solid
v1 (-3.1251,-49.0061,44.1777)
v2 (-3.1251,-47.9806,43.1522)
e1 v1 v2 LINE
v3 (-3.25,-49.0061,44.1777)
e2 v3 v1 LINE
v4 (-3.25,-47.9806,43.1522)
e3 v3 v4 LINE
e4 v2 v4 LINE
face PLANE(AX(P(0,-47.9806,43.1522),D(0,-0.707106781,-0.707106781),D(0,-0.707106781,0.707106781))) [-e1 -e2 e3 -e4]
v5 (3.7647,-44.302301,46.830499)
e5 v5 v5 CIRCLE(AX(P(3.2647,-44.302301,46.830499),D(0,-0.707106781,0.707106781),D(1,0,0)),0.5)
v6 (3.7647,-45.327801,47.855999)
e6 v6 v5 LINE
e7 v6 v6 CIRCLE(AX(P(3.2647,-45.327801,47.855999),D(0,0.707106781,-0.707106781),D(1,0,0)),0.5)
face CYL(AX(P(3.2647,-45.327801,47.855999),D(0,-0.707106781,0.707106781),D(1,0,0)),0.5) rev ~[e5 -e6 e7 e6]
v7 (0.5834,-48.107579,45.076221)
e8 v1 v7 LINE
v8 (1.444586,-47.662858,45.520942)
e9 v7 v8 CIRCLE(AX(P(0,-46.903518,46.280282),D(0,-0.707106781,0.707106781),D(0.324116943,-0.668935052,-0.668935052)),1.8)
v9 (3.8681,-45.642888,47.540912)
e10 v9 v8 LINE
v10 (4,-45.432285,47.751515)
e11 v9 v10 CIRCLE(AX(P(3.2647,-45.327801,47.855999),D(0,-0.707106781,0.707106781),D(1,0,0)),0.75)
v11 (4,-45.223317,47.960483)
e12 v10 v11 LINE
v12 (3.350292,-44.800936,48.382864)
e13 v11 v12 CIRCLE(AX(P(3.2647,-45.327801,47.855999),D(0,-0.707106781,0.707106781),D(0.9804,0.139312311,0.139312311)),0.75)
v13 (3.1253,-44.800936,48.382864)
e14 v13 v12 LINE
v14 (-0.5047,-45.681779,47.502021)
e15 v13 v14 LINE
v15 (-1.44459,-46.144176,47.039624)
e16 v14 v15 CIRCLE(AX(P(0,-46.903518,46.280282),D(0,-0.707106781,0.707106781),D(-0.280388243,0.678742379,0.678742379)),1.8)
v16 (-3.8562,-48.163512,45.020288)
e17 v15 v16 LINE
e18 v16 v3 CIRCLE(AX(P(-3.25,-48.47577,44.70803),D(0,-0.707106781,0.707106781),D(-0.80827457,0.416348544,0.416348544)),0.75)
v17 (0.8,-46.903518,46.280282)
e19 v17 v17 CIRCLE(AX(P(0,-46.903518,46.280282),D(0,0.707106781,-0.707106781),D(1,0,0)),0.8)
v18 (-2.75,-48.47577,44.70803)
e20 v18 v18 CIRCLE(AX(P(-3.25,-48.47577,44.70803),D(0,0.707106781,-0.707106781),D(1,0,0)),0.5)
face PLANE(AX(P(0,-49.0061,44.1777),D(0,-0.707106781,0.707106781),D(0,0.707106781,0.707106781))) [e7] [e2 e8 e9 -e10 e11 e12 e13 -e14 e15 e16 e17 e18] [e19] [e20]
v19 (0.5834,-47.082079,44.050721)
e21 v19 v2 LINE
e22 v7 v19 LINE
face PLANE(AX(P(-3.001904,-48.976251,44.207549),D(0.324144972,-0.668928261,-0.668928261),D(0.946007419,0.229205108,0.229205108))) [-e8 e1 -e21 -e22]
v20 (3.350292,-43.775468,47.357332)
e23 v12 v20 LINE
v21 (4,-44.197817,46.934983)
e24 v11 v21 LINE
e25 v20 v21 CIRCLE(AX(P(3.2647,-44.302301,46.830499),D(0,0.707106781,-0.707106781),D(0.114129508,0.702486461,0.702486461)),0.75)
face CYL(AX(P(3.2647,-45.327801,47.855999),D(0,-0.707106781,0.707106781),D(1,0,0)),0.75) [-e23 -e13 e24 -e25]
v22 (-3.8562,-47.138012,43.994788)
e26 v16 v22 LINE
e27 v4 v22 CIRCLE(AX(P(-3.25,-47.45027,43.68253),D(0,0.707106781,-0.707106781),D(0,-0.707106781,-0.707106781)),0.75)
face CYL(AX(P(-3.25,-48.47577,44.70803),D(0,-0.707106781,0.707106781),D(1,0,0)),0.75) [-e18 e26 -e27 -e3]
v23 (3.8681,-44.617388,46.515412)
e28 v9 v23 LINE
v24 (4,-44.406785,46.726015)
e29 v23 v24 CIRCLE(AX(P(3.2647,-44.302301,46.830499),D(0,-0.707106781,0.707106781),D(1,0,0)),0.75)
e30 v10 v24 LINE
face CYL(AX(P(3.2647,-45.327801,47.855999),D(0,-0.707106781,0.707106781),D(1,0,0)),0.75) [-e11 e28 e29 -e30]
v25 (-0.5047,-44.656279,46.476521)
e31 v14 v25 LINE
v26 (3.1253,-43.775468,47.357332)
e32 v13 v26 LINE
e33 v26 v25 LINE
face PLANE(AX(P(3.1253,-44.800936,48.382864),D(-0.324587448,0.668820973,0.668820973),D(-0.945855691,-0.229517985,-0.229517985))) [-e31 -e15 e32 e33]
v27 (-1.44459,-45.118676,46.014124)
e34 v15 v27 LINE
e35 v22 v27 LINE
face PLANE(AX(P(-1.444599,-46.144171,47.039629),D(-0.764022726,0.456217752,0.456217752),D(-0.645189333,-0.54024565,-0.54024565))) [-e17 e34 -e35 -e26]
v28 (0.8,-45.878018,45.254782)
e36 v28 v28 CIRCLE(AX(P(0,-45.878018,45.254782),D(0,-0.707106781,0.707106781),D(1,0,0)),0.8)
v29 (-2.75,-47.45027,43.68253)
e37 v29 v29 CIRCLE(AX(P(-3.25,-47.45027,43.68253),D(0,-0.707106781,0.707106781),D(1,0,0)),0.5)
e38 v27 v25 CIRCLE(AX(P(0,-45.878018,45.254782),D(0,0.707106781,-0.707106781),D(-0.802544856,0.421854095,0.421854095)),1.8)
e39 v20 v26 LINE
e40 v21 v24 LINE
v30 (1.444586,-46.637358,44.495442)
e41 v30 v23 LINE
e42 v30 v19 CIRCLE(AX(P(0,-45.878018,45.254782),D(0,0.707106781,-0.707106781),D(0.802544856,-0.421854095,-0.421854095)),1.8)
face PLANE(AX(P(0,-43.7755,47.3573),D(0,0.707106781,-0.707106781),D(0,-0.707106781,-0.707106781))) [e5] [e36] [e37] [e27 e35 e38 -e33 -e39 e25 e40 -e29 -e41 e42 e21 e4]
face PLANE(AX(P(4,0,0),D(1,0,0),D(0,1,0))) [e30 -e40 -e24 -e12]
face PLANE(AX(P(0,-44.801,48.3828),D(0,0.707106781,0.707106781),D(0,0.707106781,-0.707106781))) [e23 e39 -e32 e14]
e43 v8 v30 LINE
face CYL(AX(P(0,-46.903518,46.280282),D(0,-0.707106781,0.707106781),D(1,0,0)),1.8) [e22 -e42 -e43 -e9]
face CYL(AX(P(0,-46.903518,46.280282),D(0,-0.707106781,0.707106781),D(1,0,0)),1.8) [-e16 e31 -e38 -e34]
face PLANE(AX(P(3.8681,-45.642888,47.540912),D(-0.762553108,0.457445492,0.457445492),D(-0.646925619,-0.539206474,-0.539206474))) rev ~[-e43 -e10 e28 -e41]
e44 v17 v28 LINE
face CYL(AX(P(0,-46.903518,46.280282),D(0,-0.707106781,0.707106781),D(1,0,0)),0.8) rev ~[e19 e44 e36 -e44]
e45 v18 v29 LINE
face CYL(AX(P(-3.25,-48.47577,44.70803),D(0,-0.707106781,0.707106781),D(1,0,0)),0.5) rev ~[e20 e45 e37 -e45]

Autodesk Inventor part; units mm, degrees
ref_plane "YZ Plane" through (0, 0, 0) normal (1, 0, 0) x (0, 1, 0)
ref_plane "XZ Plane" through (0, 0, 0) normal (0, 1, 0) x (-1, 0, 0)
ref_plane "XY Plane" through (0, 0, 0) normal (0, 0, 1) x (1, 0, 0)
sketch "Sketch1" plane through (0, 0, 0) normal (1, 0, 0) x (0, 1, 0)
  circle A0 centre (-9.1612, 46.1081) radius 0.5 construction
  circle A1 centre (-9.1612, 46.1081) radius 0.9 construction
  line L0 (0, 43.0329) -> (-28.9151, 45.5627) construction
  line L1 (1.0918, 43.1767) -> (-27.4928, 38.1364) construction
  line L2 (-1.0918, 51.3262) -> (-28.367, 41.3989) construction
  line L3 (0, 51.4699) -> (-28.9151, 48.9402) construction
  line L4 (17.609, 51.9698) -> (-38.9081, 36.826) construction
  line L5 (18.2302, 47.2514) -> (-40.2807, 47.2514) construction
  line L6 (-2.4562, 42.2517) -> (-3.9425, 12.3724) construction
  line L7 (-19.1091, 33.3894) -> (19.1091, 33.3894) construction
  line L8 (-15.9499, 49.3393) -> (15.9499, 17.4395) construction
  line L9 (-15.9953, 17.3941) -> (15.9953, 49.3847) construction
  line L10 (2.4672, 42.2517) -> (3.9506, 12.3724) construction
  line L11 (-4.2099, 47.2514) -> (-6.25, 6.2414) construction
  line L12 (4.2215, 47.2514) -> (6.2448, 6.4952) construction
  circle A2 centre (-12.7187, 42.5506) radius 0.9 construction
  line L13 (-11.8457, 45.2351) -> (-10.9619, 46.119) construction
  line L14 (-10.9619, 46.119) -> (-9.1941, 44.3513) construction
  line L15 (-12.7296, 44.3513) -> (-13.501, 42.9956) construction
  line L16 (-11.8457, 45.2351) -> (-12.7296, 44.3513) construction
  line L17 (-10.9619, 42.5835) -> (-12.2433, 41.7864) construction
  line L18 (-12.7296, 44.3513) -> (-10.9619, 42.5835) construction
  line L19 (-10.9619, 46.119) -> (-9.6062, 46.8904) construction
  line L20 (-9.1941, 44.3513) -> (-10.078, 43.4674) construction
  line L21 (-10.9619, 42.5835) -> (-10.078, 43.4674) construction
  circle A3 centre (-12.7187, 42.5506) radius 0.5 construction
  line L22 (-13.4028, 41.8664) -> (-9.1612, 46.1081) construction
  line L23 (-9.1941, 44.3513) -> (-8.3969, 45.6327) construction
  line L24 (0.0006, 41.0008) -> (0, 41.0008) construction
  line L25 (0.0006, 41.0001) -> (0, 41.0001) construction
  line L26 (-2.4567, 42.2414) -> (2.4677, 42.2414) construction
  line L27 (2.4672, 42.2517) -> (-2.4562, 42.2517) construction
  line L28 (3, 47.2514) -> (4.2185, 47.2514) construction
  line L29 (0, 48.3894) -> (0, 48.3894) construction
  line L30 (-4.2185, 47.2514) -> (-4.2099, 47.2514) construction
  line L31 (0, 51.4699) -> (0, 43.0329) construction
  line L32 (-1.0918, 51.3262) -> (1.0918, 43.1767) construction
  ellipse E0 centre (0, 47.2514) end of major axis (-3, 47.2514) minor radius 3 (0.0225, 44.2515) -> (-0.0225, 44.2515) ccw construction
  circle A4 centre (0, 47.2514) radius 3 construction
  ellipse E1 centre (0, 47.2514) end of major axis (4.2185, 47.2514) minor radius 4.2127 (4.2185, 47.2514) -> (-4.2185, 47.2514) ccw construction
  circle A5 centre (0, 47.2514) radius 4.2185 construction
  line L33 (-6.0016, 11.2344) -> (6.0096, 11.2344) construction
  line L34 (-3.9425, 12.3724) -> (3.9506, 12.3724) construction
  ellipse E2 centre (0, 6.2414) end of major axis (-5, 6.2414) minor radius 5 construction
  ellipse E3 centre (0, 6.2414) end of major axis (6.25, 6.2414) minor radius 6.2414 (-6.2423, 6.5518) -> (6.2393, 6.6057) ccw construction
  line L35 (-28.1887, 40.7336) -> (-33.0183, 39.4395) construction
  line L36 (-34.1303, 30.7554) -> (-31, 33.8856) construction
  line L37 (-42.8892, 48.6033) -> (-22.6298, 28.3438) construction
  circle A6 centre (-31.7936, 38.7324) radius 0.2 construction
  circle A7 centre (-33.0183, 39.4395) radius 0.2 construction
  circle A8 centre (-32.7595, 38.4736) radius 0.6398 construction
  circle A9 centre (-32.7595, 38.4736) radius 0.6398 construction
  line L38 (-33.6434, 39.3574) -> (-31.8756, 37.5897) construction
  line L39 (-33.6434, 39.3574) -> (-31.5728, 39.3574) construction
  line L40 (-27.4928, 38.1364) -> (-28.367, 41.3989) construction
  line L41 (-28.9151, 45.5627) -> (-28.9151, 48.9402) construction
  line L42 (-34.0028, 47.2514) -> (-25.2783, 38.5269) construction
  line L43 (-28.1887, 40.7336) -> (-22.3931, 42.2865) construction
  line L44 (-21.5614, 39.1823) -> (-22.7073, 43.4588) construction
  line L45 (-27.6711, 38.8017) -> (-21.8755, 40.3546) construction
  line L46 (-32.5007, 37.5076) -> (-27.6711, 38.8017) construction
  line L47 (-42.7094, 48.4234) -> (-41.2248, 46.9389) construction
  line L48 (-33.0183, 39.4395) -> (-32.5007, 37.5076) construction
  circle A10 centre (-32.5007, 37.5076) radius 0.2 construction
  circle A11 centre (-32.7595, 38.4736) radius 1.01 construction
  circle A12 centre (-33.7254, 38.2147) radius 0.2 construction
  circle A13 centre (-32.7595, 38.4736) radius 1.25 construction
  line L49 (-31.8756, 37.5897) -> (-33.2898, 36.1755) construction
  line L50 (-31.8756, 37.5897) -> (-32.9109, 35.7965) construction
  line L51 (-35.0576, 37.9432) -> (-33.6434, 39.3574) construction
  line L52 (-32.9109, 35.7965) -> (-33.8666, 34.8408) construction
  line L53 (-33.2898, 36.1755) -> (-35.0576, 37.9432) construction
  line L54 (-35.4365, 38.3222) -> (-32.9109, 35.7965) construction
  line L55 (-36.3923, 37.3664) -> (-35.4365, 38.3222) construction
  line L56 (-33.8666, 34.8408) -> (-36.3923, 37.3664) construction
  line L57 (-31, 33.8856) -> (-41.6066, 44.4922) construction
  line L58 (-44.7369, 41.362) -> (-34.1303, 30.7554) construction
  line L59 (-43.1717, 42.9271) -> (-32.5651, 32.3205) construction
  line L60 (-33.6434, 39.3574) -> (-35.4365, 38.3222) construction
  circle A14 centre (-46.5116, 43.1367) radius 1.0497 construction
  line L61 (-47.1835, 40.9802) -> (-44.2042, 43.9595) construction
  line L62 (-46.1769, 46.993) -> (-47.2764, 45.8935) construction
  line L63 (-43.7409, 42.358) -> (-42.6414, 43.4574) construction
  line L64 (-43.1717, 42.9271) -> (-45.2366, 44.992) construction
  line L65 (-47.2764, 45.8935) -> (-43.7409, 42.358) construction
  line L66 (-45.8947, 42.269) -> (-42.5137, 45.6501) construction
  line L67 (-41.6066, 44.4922) -> (-44.7369, 41.362) construction
  line L68 (-48.6681, 42.4647) -> (-42.7094, 48.4234) construction
  line L69 (-41.9671, 47.6812) -> (-47.9258, 41.7225) construction
  line L70 (-41.2248, 46.9389) -> (-47.1835, 40.9802) construction
  line L71 (-42.6414, 43.4574) -> (-46.1769, 46.993) construction
  line L72 (-44.1236, 47.0092) -> (-42.6391, 45.5247) construction
  line L73 (-41.2248, 46.9389) -> (-44.2042, 43.9595) construction
  circle A15 centre (-43.3813, 46.2669) radius 1.0497 construction
  line L74 (-47.1835, 40.9802) -> (-48.6681, 42.4647) construction
  line L75 (-47.2538, 43.8789) -> (-45.7693, 42.3944) construction
  circle A16 centre (-43.3813, 46.2669) radius 1.0497 construction
  circle A17 centre (-46.5116, 43.1367) radius 1.05 construction
  circle A18 centre (-43.3813, 46.2669) radius 1.3 construction
  circle A19 centre (-46.5116, 43.1367) radius 1.3 construction
  line L76 (-41.9671, 47.6812) -> (-47.9258, 41.7225) construction
  line L77 (-47.9258, 41.7225) -> (-49.6936, 43.4902) construction
  line L78 (-49.6936, 43.4902) -> (-43.7349, 49.4489) construction
  line L79 (-43.7349, 49.4489) -> (-41.9671, 47.6812) construction
  line L80 (-41.9671, 47.6812) -> (-42.0968, 46.0669) construction
  line L81 (-47.9258, 41.7225) -> (-46.3116, 41.8522) construction
  line L82 (-44.9465, 44.7018) -> (-45.2271, 42.9367) construction
  line L83 (-44.9465, 44.7018) -> (-43.1813, 44.9824) construction
  line L84 (-44.801, 45.617) -> (-44.0639, 44.8421) construction
  line L85 (-44.0639, 44.8421) -> (-45.1697, 43.7902) construction
  line L86 (-45.1697, 43.7902) -> (-45.9068, 44.5651) construction
  line L87 (-45.9068, 44.5651) -> (-44.801, 45.617) construction
  line L88 (-44.801, 48.3828) -> (-49.0061, 44.1777) construction
  line L89 (-49.0061, 44.1777) -> (-52.5417, 47.7132) construction
  line L90 (-52.5417, 47.7132) -> (-48.3365, 51.9184) construction
  line L91 (-48.3365, 51.9184) -> (-44.801, 48.3828) construction
  line L92 (-46.9035, 50.4854) -> (-51.1087, 46.2803) construction
  line L93 (-44.801, 48.3828) -> (-43.7755, 47.3573)
  line L94 (-43.7755, 47.3573) -> (-47.9806, 43.1522)
  line L95 (-47.9806, 43.1522) -> (-49.0061, 44.1777)
  line L96 (-49.0061, 44.1777) -> (-44.801, 48.3828)
  line L97 (-46.1769, 46.993) -> (-45.1584, 45.9744)
  line L98 (-45.1584, 45.9744) -> (-46.2578, 44.875)
  line L99 (-46.2578, 44.875) -> (-47.2764, 45.8935)
  line L100 (-47.2764, 45.8935) -> (-46.1769, 46.993)
  point P0 (0, 0)
  point P1 (0, 0)
  point P2 (0, 33.3894)
  point P3 (-6.009, 41)
  point P4 (0, 47.2514)
  point P5 (0, 47.2514)
  point P6 (0, 0)
  point P7 (0, 0)
  point P8 (0, 12.3724)
  point P9 (0, 0)
  point P10 (28.7519, 36.3712)
  point P11 (-45.0774, 43.878)
  dimension "d12" = 3
  dimension "d13" = 5
  dimension "d14" = 6.2414
  dimension "d4" = 41.01
  dimension "d5" = 6.2414
  dimension "d6" = 4.993
  dimension "d7" = 5.69
  dimension "d8" = 29.869
  dimension "d9" = 1.138
  dimension "d10" = 2
  dimension "d11" = 90
  dimension "d15" = 15
  dimension "d16" = 2.5
  dimension "d17" = 1.25
  dimension "d18" = 60
  dimension "d19" = 2
  dimension "d20" = 1
  dimension "d21" = 6
  dimension "d22" = 1
  dimension "d23" = 1.8
  dimension "d24" = 5
  dimension "d25" = 2
  dimension "d26" = 2.02
  dimension "d27" = 2.5
  dimension "d28" = 0.4
  dimension "d29" = 360
  dimension "d30" = 150
  dimension "d31" = 15
  dimension "d32" = 15
  dimension "d33" = 5
  dimension "d34" = 0.75
  dimension "d35" = 4.2134
  dimension "d36" = 2
  dimension "d37" = 2.1
  dimension "d38" = 2.6
  dimension "d39" = 2.6
  dimension "d40" = 2.5
  dimension "d41" = 5
  dimension "d42" = 5.947
extrude "Extrusion1" add sketch "Sketch1" along normal mid plane 8
sketch "Sketch2" plane through (-4, -49.0061, 44.1777) normal (0, -0.7071068, 0.7071068) x (1, 0, 0)
  line L0 (0, 0) -> (8, 0) projected
  line L1 (8, 5.947) -> (8, 0) projected
  line L2 (8, 5.947) -> (0, 5.947) projected
  line L3 (0, 0) -> (0, 5.947) projected
  line L4 (0, 0) -> (8, 5.947)
  line L5 (0, 5.947) -> (0, 0) projected
  line L6 (0, 5.947) -> (8, 0)
  line L7 (0, 5.947) -> (8, 5.947) projected
  line L8 (4, 5.947) -> (4, -0.1076) construction
  line L9 (0, 2.9735) -> (8, 3) construction
  circle A0 centre (0.75, 0.75) radius 0.75
  circle A1 centre (4, 2.9735) radius 1.8
  line L10 (0.1438, 1.1916) -> (0.9981, 0.0422)
  circle A2 centre (0.7353, 5.2019) radius 0.75
  line L11 (0.1319, 4.7563) -> (0.9787, 5.9113)
  circle A3 centre (7.25, 0.75) radius 0.75
  line L12 (7.8562, 1.1916) -> (7.0019, 0.0422)
  line L13 (7.8681, 4.7563) -> (7.0213, 5.9113)
  circle A4 centre (7.2647, 5.2019) radius 0.75
  line L14 (2.6994, 4.2179) -> (0.1438, 1.1916)
  line L15 (0.8749, 0) -> (4.5834, 1.2707)
  line L16 (7.1253, 5.947) -> (3.4953, 4.7013)
  line L17 (7.8681, 4.7563) -> (5.295, 1.7233)
  line L18 (0, 5.947) -> (8, 5.947)
  line L19 (8, 5.947) -> (8, 0)
  line L20 (8, 0) -> (0, 0)
  line L21 (0, 0) -> (0, 5.947)
  circle A5 centre (4, 2.9735) radius 0.8
  circle A6 centre (0.75, 0.75) radius 0.5
  circle A7 centre (7.2647, 5.2019) radius 0.5
  point P0 (4, 3.4142)
  point P1 (8, 5.3499)
  point P2 (7.3505, 5.947)
  point P3 (8, 5.0539)
  point P4 (7.8027, 4.6793)
  point P5 (5.4446, 1.8996)
  point P6 (0, 0.75)
  point P7 (0.2132, 1.2737)
  point P8 (2.5554, 4.0474)
  point P9 (7.1253, 5.947)
  point P10 (0.75, 0)
  point P11 (4, 3)
  dimension "d45" = 1.5
  dimension "d46" = 3.6
  dimension "d49" = 1.6
  dimension "d52" = 1
  dimension "d53" = 1
extrude "Extrusion2" cut sketch "Sketch2" against normal through all contours L4 A0 L0 | L3 A0 L4 | L3 A2 L6 L14 A0 | L15 A1 L6 A3 L0 | L3 A2 L6 L11 | A3 L6 L0 | A3 L12 L6 | L3 L6 A2 | L11 L6 A2 | L6 A2 L2 L16 A1 | L6 A3 L1 | A3 L6 L12 | L6 L12 A3 | L2 A2 L6 | A2 L2 L11 L6 | L6 L11 A2 | A3 L6 L17 A4 L1 | A3 L12 L6 | A4 L4 L1 | L4 A4 L2
extrude "Extrusion3" cut sketch "Sketch2" against normal through all contours A5 L4 L6 | L6 L4 A5 | L4 L6 A5 | L4 A5 L6
extrude "Extrusion4" cut sketch "Sketch2" against normal through all contours A6 L10 L4 | L4 L10 A6 | A6 L4 L10 | L4 A6 L10 | A7 L4 L13 | L13 L4 A7 | A7 L4 L13 | L13 L4 A7
properties part number "clamp_mechanism" material "Steel, Mild"
